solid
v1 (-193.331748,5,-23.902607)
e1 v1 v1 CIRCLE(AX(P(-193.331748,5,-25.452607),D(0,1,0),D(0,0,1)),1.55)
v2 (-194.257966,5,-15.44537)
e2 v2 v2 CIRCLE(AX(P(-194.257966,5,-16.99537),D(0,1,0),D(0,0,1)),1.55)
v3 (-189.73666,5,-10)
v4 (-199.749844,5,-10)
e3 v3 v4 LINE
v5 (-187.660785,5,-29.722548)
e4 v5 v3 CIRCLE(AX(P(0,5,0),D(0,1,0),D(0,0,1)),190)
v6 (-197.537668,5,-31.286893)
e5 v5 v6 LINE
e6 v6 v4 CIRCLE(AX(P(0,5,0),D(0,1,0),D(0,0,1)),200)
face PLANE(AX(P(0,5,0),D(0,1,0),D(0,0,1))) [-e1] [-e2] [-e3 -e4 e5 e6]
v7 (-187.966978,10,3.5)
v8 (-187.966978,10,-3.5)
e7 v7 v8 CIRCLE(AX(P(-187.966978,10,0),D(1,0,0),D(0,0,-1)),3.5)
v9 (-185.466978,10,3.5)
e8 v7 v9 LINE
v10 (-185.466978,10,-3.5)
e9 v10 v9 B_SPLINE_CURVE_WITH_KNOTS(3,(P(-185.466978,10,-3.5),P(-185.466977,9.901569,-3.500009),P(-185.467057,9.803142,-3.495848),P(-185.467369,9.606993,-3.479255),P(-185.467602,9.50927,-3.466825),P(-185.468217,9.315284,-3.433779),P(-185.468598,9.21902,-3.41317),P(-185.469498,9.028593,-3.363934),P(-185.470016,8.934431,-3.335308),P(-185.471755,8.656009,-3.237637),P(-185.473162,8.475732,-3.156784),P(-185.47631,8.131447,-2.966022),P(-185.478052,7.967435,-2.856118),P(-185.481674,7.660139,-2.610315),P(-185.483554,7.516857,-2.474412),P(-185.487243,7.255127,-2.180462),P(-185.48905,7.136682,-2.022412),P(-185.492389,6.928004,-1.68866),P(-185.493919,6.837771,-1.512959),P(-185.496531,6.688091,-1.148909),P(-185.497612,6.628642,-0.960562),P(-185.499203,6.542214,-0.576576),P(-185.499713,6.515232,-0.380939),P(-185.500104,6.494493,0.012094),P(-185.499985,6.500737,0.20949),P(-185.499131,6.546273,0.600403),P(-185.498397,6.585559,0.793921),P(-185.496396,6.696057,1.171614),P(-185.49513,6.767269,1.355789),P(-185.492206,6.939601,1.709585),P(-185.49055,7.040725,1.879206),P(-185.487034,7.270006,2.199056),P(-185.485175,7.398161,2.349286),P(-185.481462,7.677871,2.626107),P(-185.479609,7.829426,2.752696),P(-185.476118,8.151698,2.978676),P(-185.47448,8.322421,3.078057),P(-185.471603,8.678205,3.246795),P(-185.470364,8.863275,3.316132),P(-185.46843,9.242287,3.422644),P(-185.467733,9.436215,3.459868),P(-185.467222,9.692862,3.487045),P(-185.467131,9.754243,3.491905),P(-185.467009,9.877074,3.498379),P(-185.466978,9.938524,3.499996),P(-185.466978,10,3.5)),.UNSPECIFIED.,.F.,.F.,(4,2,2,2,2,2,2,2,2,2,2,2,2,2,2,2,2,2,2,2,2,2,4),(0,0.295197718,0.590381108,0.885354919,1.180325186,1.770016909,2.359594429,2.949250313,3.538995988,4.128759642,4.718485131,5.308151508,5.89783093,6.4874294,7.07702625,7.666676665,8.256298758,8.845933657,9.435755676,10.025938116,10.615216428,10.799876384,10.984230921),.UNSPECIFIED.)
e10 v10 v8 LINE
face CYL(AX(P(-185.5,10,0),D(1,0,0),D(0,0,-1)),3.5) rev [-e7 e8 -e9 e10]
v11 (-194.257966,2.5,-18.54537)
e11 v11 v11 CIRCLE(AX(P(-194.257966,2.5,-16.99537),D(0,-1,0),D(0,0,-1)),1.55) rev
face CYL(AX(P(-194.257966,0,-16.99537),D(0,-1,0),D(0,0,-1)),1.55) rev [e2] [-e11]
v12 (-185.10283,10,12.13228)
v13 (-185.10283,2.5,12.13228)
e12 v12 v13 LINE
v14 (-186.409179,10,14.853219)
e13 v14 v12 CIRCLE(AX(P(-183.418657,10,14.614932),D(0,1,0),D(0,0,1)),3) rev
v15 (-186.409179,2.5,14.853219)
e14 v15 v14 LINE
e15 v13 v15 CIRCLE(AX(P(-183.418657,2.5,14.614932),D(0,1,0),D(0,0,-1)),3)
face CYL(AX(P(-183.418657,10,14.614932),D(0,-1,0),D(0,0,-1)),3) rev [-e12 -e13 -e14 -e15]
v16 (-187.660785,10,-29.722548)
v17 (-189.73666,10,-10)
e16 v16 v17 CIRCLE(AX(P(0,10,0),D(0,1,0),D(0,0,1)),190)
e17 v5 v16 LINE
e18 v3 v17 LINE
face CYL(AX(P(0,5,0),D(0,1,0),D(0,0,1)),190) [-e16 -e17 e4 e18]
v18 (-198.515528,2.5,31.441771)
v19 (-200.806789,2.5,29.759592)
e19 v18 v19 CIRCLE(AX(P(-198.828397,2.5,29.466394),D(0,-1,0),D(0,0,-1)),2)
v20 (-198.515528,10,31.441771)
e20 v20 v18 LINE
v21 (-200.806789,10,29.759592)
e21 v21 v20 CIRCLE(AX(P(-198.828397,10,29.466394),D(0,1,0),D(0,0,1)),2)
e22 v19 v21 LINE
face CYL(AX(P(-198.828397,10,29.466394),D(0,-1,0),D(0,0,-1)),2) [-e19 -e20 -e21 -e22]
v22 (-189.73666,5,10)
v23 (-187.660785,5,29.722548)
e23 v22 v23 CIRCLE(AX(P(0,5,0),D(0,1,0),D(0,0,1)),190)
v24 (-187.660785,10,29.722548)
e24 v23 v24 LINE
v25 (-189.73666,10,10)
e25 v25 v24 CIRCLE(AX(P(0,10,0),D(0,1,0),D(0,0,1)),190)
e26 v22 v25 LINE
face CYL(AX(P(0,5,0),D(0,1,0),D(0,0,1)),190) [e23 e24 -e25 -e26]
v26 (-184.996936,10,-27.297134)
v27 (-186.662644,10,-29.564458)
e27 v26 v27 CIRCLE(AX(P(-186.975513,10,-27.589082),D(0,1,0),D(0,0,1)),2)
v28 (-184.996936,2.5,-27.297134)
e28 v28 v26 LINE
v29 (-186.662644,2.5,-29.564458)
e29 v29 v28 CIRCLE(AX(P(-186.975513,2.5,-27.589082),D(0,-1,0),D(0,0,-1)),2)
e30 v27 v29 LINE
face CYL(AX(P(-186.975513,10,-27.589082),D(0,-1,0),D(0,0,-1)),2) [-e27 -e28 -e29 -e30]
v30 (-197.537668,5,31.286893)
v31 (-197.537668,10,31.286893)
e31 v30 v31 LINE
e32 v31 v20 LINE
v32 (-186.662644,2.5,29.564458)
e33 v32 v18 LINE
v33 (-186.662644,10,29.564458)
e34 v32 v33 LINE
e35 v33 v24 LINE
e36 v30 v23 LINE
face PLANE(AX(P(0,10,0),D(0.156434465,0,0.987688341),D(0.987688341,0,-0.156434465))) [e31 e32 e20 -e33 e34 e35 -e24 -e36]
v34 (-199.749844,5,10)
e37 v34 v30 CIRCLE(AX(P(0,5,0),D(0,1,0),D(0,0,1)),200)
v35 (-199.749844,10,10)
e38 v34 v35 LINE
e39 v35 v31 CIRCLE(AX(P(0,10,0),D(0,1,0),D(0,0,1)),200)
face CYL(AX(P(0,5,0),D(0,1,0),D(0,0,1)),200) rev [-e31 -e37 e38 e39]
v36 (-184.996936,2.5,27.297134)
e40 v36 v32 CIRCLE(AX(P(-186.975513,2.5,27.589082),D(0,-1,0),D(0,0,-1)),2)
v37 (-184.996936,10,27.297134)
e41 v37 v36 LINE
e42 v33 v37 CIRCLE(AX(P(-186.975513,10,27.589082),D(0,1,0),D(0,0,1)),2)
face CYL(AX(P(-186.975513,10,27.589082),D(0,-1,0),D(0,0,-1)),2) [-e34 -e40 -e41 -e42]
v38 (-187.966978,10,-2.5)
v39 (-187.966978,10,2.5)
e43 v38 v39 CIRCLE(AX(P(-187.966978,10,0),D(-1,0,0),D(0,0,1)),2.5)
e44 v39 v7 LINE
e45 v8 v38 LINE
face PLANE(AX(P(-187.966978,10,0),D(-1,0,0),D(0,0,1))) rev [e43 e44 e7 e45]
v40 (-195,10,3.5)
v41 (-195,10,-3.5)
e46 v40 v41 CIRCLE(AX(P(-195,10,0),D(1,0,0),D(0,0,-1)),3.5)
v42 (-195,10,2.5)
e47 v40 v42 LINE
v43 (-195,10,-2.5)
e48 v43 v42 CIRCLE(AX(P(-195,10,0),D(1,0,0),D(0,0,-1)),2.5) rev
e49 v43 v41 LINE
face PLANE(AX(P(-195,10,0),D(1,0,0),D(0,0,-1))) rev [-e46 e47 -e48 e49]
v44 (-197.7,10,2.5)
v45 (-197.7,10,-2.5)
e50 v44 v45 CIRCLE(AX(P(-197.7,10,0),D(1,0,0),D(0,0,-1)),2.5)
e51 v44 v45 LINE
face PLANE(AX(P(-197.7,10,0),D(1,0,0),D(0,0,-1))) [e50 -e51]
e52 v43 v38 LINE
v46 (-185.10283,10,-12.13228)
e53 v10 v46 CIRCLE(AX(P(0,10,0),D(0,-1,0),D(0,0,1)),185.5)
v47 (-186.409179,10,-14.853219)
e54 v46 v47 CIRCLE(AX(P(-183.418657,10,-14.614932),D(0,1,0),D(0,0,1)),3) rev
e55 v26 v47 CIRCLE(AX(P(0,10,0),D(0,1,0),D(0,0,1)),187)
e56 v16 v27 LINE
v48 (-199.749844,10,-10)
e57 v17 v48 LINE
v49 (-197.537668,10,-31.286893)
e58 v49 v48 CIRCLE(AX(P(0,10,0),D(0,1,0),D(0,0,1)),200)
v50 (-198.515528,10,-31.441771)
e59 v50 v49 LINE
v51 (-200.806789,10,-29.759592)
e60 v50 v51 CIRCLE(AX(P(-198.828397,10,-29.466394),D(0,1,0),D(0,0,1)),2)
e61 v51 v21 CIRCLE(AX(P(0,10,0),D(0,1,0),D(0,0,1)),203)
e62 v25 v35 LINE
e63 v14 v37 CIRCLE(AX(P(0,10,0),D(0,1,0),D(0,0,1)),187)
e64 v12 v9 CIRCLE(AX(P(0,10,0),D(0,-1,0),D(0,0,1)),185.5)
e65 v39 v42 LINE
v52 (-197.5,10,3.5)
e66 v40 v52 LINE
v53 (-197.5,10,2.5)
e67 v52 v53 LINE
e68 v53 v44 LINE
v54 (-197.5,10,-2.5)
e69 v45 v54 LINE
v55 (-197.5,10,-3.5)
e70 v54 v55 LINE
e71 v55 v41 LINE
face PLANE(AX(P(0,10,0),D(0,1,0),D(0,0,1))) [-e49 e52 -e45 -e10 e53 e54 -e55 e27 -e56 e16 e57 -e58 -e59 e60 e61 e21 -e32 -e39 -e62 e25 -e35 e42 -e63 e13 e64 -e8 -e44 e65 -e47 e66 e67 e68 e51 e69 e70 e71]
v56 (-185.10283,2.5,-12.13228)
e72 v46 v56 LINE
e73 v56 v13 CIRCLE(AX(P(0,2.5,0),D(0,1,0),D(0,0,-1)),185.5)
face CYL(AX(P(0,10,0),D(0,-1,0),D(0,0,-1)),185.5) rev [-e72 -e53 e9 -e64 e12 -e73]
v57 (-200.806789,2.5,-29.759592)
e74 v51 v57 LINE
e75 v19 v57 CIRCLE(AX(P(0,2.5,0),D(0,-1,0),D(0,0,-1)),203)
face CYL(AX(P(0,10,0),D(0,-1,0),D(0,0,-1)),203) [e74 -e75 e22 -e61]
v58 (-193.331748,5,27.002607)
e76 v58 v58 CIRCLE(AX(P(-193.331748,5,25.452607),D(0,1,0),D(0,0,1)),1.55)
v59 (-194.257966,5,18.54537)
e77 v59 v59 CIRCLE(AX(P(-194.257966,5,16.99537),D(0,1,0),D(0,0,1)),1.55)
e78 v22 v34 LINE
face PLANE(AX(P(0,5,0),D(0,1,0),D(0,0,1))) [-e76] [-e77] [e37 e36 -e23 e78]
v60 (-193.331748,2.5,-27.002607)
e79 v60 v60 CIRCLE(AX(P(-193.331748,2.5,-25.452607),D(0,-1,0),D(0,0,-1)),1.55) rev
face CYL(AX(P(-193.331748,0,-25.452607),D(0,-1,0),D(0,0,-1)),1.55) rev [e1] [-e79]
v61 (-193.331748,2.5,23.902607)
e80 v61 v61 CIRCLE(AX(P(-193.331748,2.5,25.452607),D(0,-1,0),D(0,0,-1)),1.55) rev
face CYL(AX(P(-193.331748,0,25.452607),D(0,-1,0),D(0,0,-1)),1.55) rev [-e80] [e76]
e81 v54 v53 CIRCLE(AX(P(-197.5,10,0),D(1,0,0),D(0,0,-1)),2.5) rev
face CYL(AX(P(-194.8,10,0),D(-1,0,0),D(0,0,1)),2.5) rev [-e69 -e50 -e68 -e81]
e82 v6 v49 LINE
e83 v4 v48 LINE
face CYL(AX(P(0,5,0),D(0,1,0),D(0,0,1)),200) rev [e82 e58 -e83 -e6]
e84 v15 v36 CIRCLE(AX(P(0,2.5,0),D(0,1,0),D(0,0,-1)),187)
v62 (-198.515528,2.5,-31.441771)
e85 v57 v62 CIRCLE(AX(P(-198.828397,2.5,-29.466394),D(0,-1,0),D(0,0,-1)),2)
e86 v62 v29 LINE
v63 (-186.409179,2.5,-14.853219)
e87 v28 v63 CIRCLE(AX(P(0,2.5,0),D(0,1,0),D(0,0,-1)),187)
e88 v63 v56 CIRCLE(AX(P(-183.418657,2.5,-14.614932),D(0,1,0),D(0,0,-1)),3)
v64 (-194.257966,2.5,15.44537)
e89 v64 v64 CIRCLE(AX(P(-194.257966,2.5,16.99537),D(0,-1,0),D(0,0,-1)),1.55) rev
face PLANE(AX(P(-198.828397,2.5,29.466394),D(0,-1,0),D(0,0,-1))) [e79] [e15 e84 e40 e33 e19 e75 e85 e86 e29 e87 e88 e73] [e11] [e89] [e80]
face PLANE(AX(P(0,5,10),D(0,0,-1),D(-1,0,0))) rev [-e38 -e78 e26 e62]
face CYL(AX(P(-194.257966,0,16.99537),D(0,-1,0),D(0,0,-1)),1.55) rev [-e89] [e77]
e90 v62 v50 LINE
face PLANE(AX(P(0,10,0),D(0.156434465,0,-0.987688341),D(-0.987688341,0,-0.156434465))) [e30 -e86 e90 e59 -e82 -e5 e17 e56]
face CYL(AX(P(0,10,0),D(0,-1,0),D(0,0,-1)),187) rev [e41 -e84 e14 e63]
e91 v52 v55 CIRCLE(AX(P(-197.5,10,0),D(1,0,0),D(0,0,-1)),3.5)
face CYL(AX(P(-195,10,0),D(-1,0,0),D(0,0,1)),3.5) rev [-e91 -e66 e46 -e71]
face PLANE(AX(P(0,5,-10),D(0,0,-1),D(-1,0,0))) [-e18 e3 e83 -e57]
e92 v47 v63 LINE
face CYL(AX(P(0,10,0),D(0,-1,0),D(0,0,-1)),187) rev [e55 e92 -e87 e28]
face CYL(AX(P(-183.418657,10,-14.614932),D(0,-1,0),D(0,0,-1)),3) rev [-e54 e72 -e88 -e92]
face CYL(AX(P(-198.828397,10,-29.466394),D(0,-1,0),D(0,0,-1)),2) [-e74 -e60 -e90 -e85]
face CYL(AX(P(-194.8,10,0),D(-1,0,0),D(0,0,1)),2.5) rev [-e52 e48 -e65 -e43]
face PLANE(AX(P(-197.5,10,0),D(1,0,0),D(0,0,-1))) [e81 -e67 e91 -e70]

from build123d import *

# Parameters (mm, degrees)
BOSS_EXTRUDE1_DEPTH        = 10
CUT_EXTRUDE1_DEPTH         = 5
F_3_1_3_1_DIAMETER_HOLE2_D = 3.1
BOSS_EXTRUDE2_DEPTH        = 10
FILLET1_R                  = 3
FILLET2_R                  = 2
SKETCH21_R                 = 2.1
CUT_EXTRUDE2_DEPTH         = 36.312840879
SKETCH22_R                 = 3.5
CUT_EXTRUDE3_DEPTH         = 2.5
CUT_EXTRUDE4_DEPTH         = 2.7
CUT_EXTRUDE4_DEPTH_BACK    = 0.2
SKETCH23_R                 = 2.5
SKETCH24_W                 = 2.5
SKETCH24_H                 = 3.5
SKETCH25_R                 = 2.5
CUT_EXTRUDE5_DEPTH         = 9.733021807
CUT_EXTRUDE6_DEPTH         = 2.5


with BuildPart() as part:
    # Sketch1 → Boss-Extrude1 (new body)
    with BuildSketch(Plane(origin=(0, 0, 0), x_dir=(1, 0, 0), z_dir=(0, 1, 0))):
        with BuildLine():
            ThreePointArc((-187.660784713, 29.722548358), (-190, 0), (-187.660784713, -29.722548358))
            Line((-187.660784713, -29.722548358), (-197.537668119, -31.286893008))
            ThreePointArc((-197.537668119, -31.286893008), (-200, 0), (-197.537668119, 31.286893008))
            Line((-197.537668119, 31.286893008), (-187.660784713, 29.722548358))
        make_face()
        with BuildLine():
            ThreePointArc((-197.537668119, -31.286893008), (-200, 0), (-197.537668119, 31.286893008))
            Line((-197.537668119, 31.286893008), (-200.500733141, 31.756196403))
            ThreePointArc((-200.500733141, 31.756196403), (-203, 0), (-200.500733141, -31.756196403))
            Line((-200.500733141, -31.756196403), (-197.537668119, -31.286893008))
        make_face()
        with BuildLine():
            Line((-184.697719691, 29.253244963), (-187.660784713, 29.722548358))
            ThreePointArc((-187.660784713, 29.722548358), (-190, 0), (-187.660784713, -29.722548358))
            Line((-187.660784713, -29.722548358), (-184.697719691, -29.253244963))
            ThreePointArc((-184.697719691, -29.253244963), (-187, 0), (-184.697719691, 29.253244963))
        make_face()
    extrude(amount=BOSS_EXTRUDE1_DEPTH)

    # Sketch15 → Cut-Extrude1 (cut)
    with BuildSketch(Plane(origin=(0, 10, 0), x_dir=(1, 0, 0), z_dir=(0, 1, 0))):
        with BuildLine():
            Line((-199.749843554, 10), (-189.73665961, 10))
            ThreePointArc((-189.73665961, 10), (-188.956218405, 19.88837666), (-187.660784713, 29.722548358))
            Line((-187.660784713, 29.722548358), (-197.537668119, 31.286893008))
            ThreePointArc((-197.537668119, 31.286893008), (-198.928692466, 20.673057674), (-199.749843554, 10))
        make_face()
        with BuildLine():
            ThreePointArc((-187.660784713, -29.722548358), (-188.956218405, -19.88837666), (-189.73665961, -10))
            Line((-189.73665961, -10), (-199.749843554, -10))
            ThreePointArc((-199.749843554, -10), (-198.928692466, -20.673057674), (-197.537668119, -31.286893008))
            Line((-197.537668119, -31.286893008), (-187.660784713, -29.722548358))
        make_face()
    extrude(amount=-CUT_EXTRUDE1_DEPTH, mode=Mode.SUBTRACT)

    # Ø3.1 (3.1) Diameter Hole2 (through all)
    with Locations(Plane(origin=(0, 0, 0), x_dir=(-1, 0, 0), z_dir=(0, -1, 0))):
        with Locations((193.331747968, -25.452607483), (194.257966128, -16.995369836), (194.257966128, 16.995369836), (193.331747968, 25.452607483)):
            Hole(F_3_1_3_1_DIAMETER_HOLE2_D / 2)

    # Sketch19 → Boss-Extrude2 (add)
    with BuildSketch(Plane(origin=(0, 0, 0), x_dir=(1, 0, 0), z_dir=(0, 1, 0))):
        with BuildLine():
            Line((-185.102830261, -12.132280472), (-186.599618646, -12.230385166))
            ThreePointArc((-186.599618646, -12.230385166), (-187, 0), (-186.599618646, 12.230385166))
            Line((-186.599618646, 12.230385166), (-185.102830261, 12.132280472))
            ThreePointArc((-185.102830261, 12.132280472), (-185.5, 0), (-185.102830261, -12.132280472))
        make_face()
    extrude(amount=BOSS_EXTRUDE2_DEPTH)

    # Fillet1
    # the kernel refuses this fillet: 3 mm, written as the material it adds along each edge
    with BuildSketch(Plane(origin=(-186.599618646, 0, -12.230385166), x_dir=(0.07241784502459461, 0, -0.9973743809232287), z_dir=(0, 1, 0))) as fillet1_piece_1:
        with BuildLine():
            CenterArc((2.608644701, -2.999925838), FILLET1_R, 89.597127862, 60.403689883)
            Line((0.010547081, -1.499962919), (-0.041414871, -1.469963661))
            ThreePointArc((-0.041414871, -1.469963661), (-0.054724976, -0.750403343), (-0.059998517, -0.000421883))
            Line((-0.059998517, -0.000421883), (-0.000421883, 0.059998517))
            ThreePointArc((-0.000421883, 0.059998517), (1.314869431, 0.064622735), (2.630160746, 0.059998517))
            Line((2.630160746, 0.059998517), (2.629738863, 0))
        make_face()
    extrude(amount=10)
    with BuildSketch(Plane(origin=(-186.599618646, 0, 12.230385166), x_dir=(0.0724178450245846, 0, 0.9973743809232295), z_dir=(0, 1, 0))) as fillet1_piece_2:
        with BuildLine():
            CenterArc((2.608644701, 2.999925838), FILLET1_R, 209.999182255, 60.403689883)
            Line((0.010547081, 1.499962919), (-0.041414871, 1.469963661))
            ThreePointArc((-0.041414871, 1.469963661), (-0.054724976, 0.750403343), (-0.059998517, 0.000421883))
            Line((-0.059998517, 0.000421883), (-0.000421883, -0.059998517))
            ThreePointArc((-0.000421883, -0.059998517), (1.314869431, -0.064622735), (2.630160746, -0.059998517))
            Line((2.630160746, -0.059998517), (2.629738863, 0))
        make_face()
    extrude(amount=10)

    # Fillet2
    fillet2_edges = [part.edges().sort_by_distance(p)[0] for p in [
        (-200.500733141, 5, 31.756196403),
        (-200.500733141, 5, -31.756196403),
        (-184.697719691, 5, -29.253244963),
        (-184.697719691, 5, 29.253244963),
    ]]
    fillet(fillet2_edges, radius=FILLET2_R)

    # Sketch21 → Cut-Extrude2 (cut, through all)
    with BuildSketch(Plane(origin=(-197.5, 0, 0), x_dir=(0, 0, -1), z_dir=(1, 0, 0))):
        with Locations((0, 10)):
            Circle(SKETCH21_R)
    extrude(amount=CUT_EXTRUDE2_DEPTH, mode=Mode.SUBTRACT)

    # Sketch22 → Cut-Extrude3 (cut)
    with BuildSketch(Plane(origin=(-197.5, 0, 0), x_dir=(0, 0, -1), z_dir=(1, 0, 0))):
        with Locations((0, 10)):
            Circle(SKETCH22_R)
    extrude(amount=CUT_EXTRUDE3_DEPTH, mode=Mode.SUBTRACT)

    # Sketch23 → Cut-Extrude4 (cut, two sides: drawn at the far end of the back side and taken through both)
    with BuildSketch(Plane(origin=(-197.5, 0, 0), x_dir=(0, 0, -1), z_dir=(1, 0, 0)).offset(-CUT_EXTRUDE4_DEPTH_BACK)):
        with Locations((0, 10)):
            Circle(SKETCH23_R)
    extrude(amount=CUT_EXTRUDE4_DEPTH + CUT_EXTRUDE4_DEPTH_BACK, mode=Mode.SUBTRACT)

    # Sketch24 → Cut-Revolve1 (revolve, cut)
    with BuildSketch(Plane(origin=(0, 10, 0), x_dir=(1, 0, 0), z_dir=(0, 1, 0))):
        with Locations((-186.716978193, 1.75)):
            Rectangle(SKETCH24_W, SKETCH24_H)
    revolve(axis=Axis((-185.5, 10, 0), (-1, 0, 0)), mode=Mode.SUBTRACT)

    # Sketch25 → Cut-Extrude5 (cut)
    with BuildSketch(Plane(origin=(-187.966978193, 0, 0), x_dir=(0, 0, -1), z_dir=(1, 0, 0))):
        with Locations((0, 10)):
            Circle(SKETCH25_R)
    extrude(amount=-CUT_EXTRUDE5_DEPTH, mode=Mode.SUBTRACT)

    # Sketch26 → Cut-Extrude6 (cut)
    with BuildSketch(Plane.XZ):
        with BuildLine():
            Line((-198.515528472, -31.441770873), (-186.662644351, -29.564458455))
            ThreePointArc((-186.662644351, -29.564458455), (-185.363721979, -28.773196969), (-184.996936421, -27.297133819))
            ThreePointArc((-184.996936421, -27.297133819), (-185.807261228, -21.087002508), (-186.409178624, -14.853219336))
            ThreePointArc((-186.409178624, -14.853219336), (-186.123110766, -13.316498702), (-185.102830261, -12.132280472))
            ThreePointArc((-185.102830261, -12.132280472), (-185.5, 0), (-185.102830261, 12.132280472))
            ThreePointArc((-185.102830261, 12.132280472), (-186.123110766, 13.316498702), (-186.409178624, 14.853219336))
            ThreePointArc((-186.409178624, 14.853219336), (-185.807261228, 21.087002508), (-184.996936421, 27.297133819))
            ThreePointArc((-184.996936421, 27.297133819), (-185.363721979, 28.773196969), (-186.662644351, 29.564458455))
            Line((-186.662644351, 29.564458455), (-198.515528472, 31.441770873))
            ThreePointArc((-198.515528472, 31.441770873), (-200.012003377, 31.078559473), (-200.806789416, 29.759592144))
            ThreePointArc((-200.806789416, 29.759592144), (-203, 0), (-200.806789416, -29.759592144))
            ThreePointArc((-200.806789416, -29.759592144), (-200.012003377, -31.078559473), (-198.515528472, -31.441770873))
        make_face()
    extrude(amount=-CUT_EXTRUDE6_DEPTH, mode=Mode.SUBTRACT)


solid = part.part
